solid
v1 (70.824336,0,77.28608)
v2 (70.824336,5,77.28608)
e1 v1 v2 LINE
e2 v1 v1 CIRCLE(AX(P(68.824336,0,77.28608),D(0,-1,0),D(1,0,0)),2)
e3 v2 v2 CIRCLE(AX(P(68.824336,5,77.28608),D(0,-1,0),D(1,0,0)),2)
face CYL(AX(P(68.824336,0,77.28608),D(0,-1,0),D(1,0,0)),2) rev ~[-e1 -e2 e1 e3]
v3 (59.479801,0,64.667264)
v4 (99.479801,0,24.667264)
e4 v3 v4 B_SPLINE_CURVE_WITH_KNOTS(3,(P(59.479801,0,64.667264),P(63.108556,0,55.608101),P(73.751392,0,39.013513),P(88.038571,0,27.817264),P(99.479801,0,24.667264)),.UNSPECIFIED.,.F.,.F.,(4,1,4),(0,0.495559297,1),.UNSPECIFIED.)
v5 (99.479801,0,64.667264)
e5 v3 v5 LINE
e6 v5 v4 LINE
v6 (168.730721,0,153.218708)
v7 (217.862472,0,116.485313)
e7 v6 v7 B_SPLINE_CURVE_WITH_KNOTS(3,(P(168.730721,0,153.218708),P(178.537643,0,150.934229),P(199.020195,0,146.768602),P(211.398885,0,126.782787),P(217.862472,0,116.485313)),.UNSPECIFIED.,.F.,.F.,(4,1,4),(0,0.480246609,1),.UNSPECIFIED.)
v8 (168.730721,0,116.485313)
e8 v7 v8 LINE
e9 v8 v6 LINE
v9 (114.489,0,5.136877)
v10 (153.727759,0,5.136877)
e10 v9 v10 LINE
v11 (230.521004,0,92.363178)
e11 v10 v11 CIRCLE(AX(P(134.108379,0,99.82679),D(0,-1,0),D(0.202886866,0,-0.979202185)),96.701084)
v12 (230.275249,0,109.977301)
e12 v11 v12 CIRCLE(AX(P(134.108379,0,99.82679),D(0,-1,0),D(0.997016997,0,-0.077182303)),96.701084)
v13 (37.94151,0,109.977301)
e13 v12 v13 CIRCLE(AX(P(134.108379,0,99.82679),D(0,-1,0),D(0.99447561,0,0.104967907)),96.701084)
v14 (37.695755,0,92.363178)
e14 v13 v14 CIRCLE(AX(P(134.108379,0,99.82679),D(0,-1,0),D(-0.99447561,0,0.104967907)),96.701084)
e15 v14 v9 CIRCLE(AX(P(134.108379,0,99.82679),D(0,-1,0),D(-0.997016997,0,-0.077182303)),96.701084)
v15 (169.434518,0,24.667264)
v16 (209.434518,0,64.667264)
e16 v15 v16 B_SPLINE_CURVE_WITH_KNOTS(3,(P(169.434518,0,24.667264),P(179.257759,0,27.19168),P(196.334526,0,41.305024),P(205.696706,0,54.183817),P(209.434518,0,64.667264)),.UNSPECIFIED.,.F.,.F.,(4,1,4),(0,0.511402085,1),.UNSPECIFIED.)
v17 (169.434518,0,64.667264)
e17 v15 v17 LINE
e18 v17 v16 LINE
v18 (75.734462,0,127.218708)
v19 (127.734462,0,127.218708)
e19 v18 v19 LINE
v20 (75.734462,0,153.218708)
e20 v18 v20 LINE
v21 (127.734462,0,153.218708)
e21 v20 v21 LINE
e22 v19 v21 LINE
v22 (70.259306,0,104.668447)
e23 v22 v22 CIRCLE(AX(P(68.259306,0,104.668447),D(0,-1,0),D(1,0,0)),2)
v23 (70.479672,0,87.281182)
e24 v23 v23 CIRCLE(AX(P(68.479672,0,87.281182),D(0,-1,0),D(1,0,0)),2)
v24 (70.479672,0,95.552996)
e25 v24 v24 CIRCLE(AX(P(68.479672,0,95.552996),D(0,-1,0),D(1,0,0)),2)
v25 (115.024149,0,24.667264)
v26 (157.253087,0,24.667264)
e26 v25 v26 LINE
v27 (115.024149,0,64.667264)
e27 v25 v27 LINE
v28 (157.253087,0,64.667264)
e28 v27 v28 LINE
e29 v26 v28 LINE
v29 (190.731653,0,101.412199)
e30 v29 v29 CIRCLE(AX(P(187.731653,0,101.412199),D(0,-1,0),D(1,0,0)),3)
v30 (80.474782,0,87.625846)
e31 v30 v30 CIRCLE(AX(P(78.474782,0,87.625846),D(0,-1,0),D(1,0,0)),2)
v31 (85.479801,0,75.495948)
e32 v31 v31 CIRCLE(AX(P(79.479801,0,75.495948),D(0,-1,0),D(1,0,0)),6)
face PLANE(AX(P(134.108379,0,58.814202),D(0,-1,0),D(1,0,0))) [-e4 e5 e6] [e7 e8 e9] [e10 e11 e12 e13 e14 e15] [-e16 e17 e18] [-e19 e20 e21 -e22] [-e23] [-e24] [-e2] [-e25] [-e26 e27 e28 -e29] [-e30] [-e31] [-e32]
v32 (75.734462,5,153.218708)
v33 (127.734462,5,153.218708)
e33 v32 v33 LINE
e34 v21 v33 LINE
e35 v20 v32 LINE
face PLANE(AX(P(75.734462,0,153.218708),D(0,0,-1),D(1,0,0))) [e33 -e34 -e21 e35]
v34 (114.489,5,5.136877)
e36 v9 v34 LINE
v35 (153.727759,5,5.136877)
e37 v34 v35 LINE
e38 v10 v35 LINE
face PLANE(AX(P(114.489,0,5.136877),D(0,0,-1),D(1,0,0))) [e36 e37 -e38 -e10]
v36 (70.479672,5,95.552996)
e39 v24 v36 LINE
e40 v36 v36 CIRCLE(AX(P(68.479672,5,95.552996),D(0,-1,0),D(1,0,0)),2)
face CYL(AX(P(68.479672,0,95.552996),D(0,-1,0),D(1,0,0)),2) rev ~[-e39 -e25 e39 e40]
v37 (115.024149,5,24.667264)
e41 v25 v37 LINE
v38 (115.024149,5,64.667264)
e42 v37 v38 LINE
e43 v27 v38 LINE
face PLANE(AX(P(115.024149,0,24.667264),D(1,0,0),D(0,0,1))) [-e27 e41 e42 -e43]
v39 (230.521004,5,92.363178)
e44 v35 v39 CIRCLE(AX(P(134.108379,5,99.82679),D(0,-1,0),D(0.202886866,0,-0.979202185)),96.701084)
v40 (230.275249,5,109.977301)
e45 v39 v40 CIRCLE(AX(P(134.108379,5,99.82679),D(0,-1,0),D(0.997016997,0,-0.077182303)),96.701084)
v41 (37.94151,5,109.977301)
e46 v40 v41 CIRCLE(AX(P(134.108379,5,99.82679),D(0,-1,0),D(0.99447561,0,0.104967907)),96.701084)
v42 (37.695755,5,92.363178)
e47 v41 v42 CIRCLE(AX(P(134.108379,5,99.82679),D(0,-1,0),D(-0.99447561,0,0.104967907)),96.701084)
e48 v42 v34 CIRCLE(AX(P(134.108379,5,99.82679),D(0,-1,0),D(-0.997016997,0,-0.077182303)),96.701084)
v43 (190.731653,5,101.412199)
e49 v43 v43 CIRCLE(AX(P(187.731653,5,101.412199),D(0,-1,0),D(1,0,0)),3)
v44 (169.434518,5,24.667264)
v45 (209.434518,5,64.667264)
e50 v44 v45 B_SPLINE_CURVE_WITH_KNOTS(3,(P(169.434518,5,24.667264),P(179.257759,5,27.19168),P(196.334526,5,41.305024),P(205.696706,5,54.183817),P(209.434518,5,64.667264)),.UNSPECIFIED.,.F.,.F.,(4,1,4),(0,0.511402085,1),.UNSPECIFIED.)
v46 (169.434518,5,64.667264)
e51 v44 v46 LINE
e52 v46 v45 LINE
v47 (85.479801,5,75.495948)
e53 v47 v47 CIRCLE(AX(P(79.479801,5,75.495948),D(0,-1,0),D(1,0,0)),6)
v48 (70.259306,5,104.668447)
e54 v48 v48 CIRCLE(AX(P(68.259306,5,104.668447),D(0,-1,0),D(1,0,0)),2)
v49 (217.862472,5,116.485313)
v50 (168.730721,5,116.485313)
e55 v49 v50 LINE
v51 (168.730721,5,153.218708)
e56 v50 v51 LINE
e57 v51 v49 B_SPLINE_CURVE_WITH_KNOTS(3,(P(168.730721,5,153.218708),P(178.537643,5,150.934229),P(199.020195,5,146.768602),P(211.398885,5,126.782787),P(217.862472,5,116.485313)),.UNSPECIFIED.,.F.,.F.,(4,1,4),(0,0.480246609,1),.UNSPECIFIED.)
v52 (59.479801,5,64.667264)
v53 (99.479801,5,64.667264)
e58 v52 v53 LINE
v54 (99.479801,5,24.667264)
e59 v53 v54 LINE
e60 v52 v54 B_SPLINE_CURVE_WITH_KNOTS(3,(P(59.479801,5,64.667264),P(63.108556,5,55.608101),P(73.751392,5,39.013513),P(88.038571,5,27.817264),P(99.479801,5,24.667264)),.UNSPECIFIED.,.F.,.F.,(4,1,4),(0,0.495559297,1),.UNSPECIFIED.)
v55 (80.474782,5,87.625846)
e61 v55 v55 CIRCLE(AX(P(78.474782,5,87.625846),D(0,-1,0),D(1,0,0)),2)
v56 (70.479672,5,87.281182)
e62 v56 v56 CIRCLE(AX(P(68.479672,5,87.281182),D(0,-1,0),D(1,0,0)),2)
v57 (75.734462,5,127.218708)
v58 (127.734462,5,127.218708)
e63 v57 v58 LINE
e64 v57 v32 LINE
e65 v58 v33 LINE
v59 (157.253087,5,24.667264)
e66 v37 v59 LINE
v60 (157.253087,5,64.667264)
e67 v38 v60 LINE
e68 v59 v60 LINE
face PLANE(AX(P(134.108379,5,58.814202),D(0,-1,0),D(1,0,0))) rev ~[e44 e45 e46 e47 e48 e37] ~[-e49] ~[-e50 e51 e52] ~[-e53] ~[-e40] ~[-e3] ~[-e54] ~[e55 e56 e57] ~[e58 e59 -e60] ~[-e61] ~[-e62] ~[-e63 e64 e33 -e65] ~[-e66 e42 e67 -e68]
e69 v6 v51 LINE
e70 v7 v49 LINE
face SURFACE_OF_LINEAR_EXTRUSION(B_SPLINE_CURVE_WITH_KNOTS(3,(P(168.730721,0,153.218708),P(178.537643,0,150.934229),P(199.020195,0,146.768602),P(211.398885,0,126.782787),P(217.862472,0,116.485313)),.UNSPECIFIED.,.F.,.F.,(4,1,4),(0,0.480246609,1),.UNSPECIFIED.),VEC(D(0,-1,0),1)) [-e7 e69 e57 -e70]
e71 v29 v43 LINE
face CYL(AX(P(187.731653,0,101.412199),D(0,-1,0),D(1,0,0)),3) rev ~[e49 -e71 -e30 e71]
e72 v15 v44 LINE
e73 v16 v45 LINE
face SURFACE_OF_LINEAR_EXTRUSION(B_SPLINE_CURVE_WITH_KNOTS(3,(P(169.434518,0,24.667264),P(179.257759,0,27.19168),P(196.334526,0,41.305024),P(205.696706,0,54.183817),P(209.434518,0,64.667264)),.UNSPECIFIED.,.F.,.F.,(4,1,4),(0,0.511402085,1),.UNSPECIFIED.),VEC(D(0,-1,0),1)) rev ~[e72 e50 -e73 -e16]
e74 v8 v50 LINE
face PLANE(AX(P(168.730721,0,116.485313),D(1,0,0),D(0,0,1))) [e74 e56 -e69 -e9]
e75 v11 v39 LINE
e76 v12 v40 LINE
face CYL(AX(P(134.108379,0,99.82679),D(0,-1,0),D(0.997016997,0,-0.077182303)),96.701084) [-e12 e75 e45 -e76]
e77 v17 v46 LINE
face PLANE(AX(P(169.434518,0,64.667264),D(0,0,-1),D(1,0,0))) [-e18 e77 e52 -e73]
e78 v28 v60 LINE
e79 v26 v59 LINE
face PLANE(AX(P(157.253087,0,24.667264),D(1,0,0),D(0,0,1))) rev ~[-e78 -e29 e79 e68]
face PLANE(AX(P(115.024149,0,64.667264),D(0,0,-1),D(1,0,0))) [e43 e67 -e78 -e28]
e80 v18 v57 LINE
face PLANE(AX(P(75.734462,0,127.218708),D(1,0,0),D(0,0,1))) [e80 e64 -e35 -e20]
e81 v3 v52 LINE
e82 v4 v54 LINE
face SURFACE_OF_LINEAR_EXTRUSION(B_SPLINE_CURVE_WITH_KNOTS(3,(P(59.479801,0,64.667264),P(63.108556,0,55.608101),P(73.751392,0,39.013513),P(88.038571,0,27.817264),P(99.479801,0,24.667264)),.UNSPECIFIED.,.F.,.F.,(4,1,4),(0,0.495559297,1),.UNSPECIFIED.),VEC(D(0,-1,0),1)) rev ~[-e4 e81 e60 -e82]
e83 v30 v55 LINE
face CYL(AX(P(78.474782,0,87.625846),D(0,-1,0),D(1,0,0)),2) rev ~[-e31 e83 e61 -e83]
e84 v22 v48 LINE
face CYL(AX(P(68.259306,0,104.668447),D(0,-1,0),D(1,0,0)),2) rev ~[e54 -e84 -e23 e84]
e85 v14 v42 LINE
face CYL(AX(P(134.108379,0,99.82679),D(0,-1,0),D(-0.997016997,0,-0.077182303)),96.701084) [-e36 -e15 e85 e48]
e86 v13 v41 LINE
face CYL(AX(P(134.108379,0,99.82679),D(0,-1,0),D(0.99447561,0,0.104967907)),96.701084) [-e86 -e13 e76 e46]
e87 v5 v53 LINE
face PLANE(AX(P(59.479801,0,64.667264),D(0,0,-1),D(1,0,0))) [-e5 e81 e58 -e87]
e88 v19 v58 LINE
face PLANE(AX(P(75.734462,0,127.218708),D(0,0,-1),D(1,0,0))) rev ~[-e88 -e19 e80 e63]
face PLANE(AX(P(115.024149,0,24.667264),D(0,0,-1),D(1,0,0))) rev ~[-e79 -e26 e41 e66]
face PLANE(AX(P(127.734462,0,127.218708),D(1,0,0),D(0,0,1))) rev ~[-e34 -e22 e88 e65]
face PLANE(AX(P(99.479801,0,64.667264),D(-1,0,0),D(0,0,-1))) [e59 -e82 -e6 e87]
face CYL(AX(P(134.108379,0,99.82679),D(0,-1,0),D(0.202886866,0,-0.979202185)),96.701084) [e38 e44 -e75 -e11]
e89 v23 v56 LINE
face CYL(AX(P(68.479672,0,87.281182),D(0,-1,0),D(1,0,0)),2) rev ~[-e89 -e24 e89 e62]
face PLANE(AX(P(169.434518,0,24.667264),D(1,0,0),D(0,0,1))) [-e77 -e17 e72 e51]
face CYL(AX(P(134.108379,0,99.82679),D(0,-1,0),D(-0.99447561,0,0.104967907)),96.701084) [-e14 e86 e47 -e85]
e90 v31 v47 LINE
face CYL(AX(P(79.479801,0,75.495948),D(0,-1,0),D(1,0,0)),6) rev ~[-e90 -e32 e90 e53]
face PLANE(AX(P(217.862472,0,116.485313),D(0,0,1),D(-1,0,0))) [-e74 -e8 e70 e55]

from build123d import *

# Parameters (mm, degrees)
F0_R     = 6
F0_R_2   = 2
F0_W     = 42.228937149
F0_H     = 40
F0_R_3   = 3
F0_W_2   = 52
F0_H_2   = 26
F1_DEPTH = 5


# Not quite as in the source:
# - the program builds the solid bodies; features that only make, move or delete a surface that nothing else refers to are left out


with BuildPart() as f1:
    # F0 (on Front) → F1 (new body)
    with BuildSketch(Plane.XZ):
        with BuildLine():
            Line((114.488999566, 5.1368772984), (153.7277594005, 5.1368772984))
            ThreePointArc((153.7277594005, 5.1368772984), (206.6891166454, 35.9273670532), (230.521004176, 92.3631780006))
            Line((230.521004176, 92.3631780006), (37.6957547904, 92.3631780006))
            ThreePointArc((37.6957547904, 92.3631780006), (61.527642321, 35.9273670532), (114.488999566, 5.1368772984))
        make_face()
        with BuildLine():
            add(Edge.make_bspline(
                [(59.4798011976, 64.6672644662), (63.1085559726, 55.6081011891), (73.7513924788, 39.0135130084), (88.0385711789, 27.8172641993), (99.4798011976, 24.6672644662)],
                knots=[0, 0, 0, 0, 0.4955592973, 1, 1, 1, 1], degree=3))
            Line((59.4798011976, 64.6672644662), (99.4798011976, 64.6672644662))
            Line((99.4798011976, 64.6672644662), (99.4798011976, 24.6672644662))
        make_face(mode=Mode.SUBTRACT)
        with Locations((79.4798011976, 75.4959482996)):
            Circle(F0_R, mode=Mode.SUBTRACT)
        with Locations((68.8243359327, 77.2860795259)):
            Circle(F0_R_2, mode=Mode.SUBTRACT)
        with Locations((68.4796720743, 87.2811824083)):
            Circle(F0_R_2, mode=Mode.SUBTRACT)
        with Locations((78.4747824073, 87.6258462667)):
            Circle(F0_R_2, mode=Mode.SUBTRACT)
        with Locations((136.1386179924, 44.6672644662)):
            Rectangle(F0_W, F0_H, mode=Mode.SUBTRACT)
        with BuildLine():
            Line((169.434517622, 64.6672644662), (209.434517622, 64.6672644662))
            add(Edge.make_bspline(
                [(169.434517622, 24.6672644662), (179.2577588513, 27.1916796699), (196.3345264834, 41.3050241265), (205.696706141, 54.1838165912), (209.434517622, 64.6672644662)],
                knots=[0, 0, 0, 0, 0.5114020852, 1, 1, 1, 1], degree=3))
            Line((169.434517622, 24.6672644662), (169.434517622, 64.6672644662))
        make_face(mode=Mode.SUBTRACT)
        with BuildLine():
            Line((37.6957547904, 92.3631780006), (230.521004176, 92.3631780006))
            ThreePointArc((230.521004176, 92.3631780006), (230.8000531475, 101.1758471342), (230.2752492915, 109.9773007924))
            Line((230.2752492915, 109.9773007924), (37.941509675, 109.9773007924))
            ThreePointArc((37.941509675, 109.9773007924), (37.4167058189, 101.1758471342), (37.6957547904, 92.3631780006))
        make_face()
        with Locations((68.4796720743, 95.552995801)):
            Circle(F0_R_2, mode=Mode.SUBTRACT)
        with Locations((68.259306113, 104.66844666)):
            Circle(F0_R_2, mode=Mode.SUBTRACT)
        with Locations((187.7316534519, 101.4121994376)):
            Circle(F0_R_3, mode=Mode.SUBTRACT)
        with BuildLine():
            Line((37.941509675, 109.9773007924), (230.2752492915, 109.9773007924))
            ThreePointArc((230.2752492915, 109.9773007924), (134.1083794832, 196.5278747198), (37.941509675, 109.9773007924))
        make_face()
        with Locations((101.7344622612, 140.218708396)):
            Rectangle(F0_W_2, F0_H_2, mode=Mode.SUBTRACT)
        with BuildLine():
            Line((168.7307208776, 116.4853125811), (168.7307208776, 153.218708396))
            add(Edge.make_bspline(
                [(168.7307208776, 153.218708396), (178.5376432275, 150.9342291161), (199.0201954085, 146.7686018938), (211.3988850452, 126.7827873103), (217.8624719381, 116.4853125811)],
                knots=[0, 0, 0, 0, 0.4802466092, 1, 1, 1, 1], degree=3))
            Line((217.8624719381, 116.4853125811), (168.7307208776, 116.4853125811))
        make_face(mode=Mode.SUBTRACT)
    extrude(amount=-F1_DEPTH)


solid = f1.part
